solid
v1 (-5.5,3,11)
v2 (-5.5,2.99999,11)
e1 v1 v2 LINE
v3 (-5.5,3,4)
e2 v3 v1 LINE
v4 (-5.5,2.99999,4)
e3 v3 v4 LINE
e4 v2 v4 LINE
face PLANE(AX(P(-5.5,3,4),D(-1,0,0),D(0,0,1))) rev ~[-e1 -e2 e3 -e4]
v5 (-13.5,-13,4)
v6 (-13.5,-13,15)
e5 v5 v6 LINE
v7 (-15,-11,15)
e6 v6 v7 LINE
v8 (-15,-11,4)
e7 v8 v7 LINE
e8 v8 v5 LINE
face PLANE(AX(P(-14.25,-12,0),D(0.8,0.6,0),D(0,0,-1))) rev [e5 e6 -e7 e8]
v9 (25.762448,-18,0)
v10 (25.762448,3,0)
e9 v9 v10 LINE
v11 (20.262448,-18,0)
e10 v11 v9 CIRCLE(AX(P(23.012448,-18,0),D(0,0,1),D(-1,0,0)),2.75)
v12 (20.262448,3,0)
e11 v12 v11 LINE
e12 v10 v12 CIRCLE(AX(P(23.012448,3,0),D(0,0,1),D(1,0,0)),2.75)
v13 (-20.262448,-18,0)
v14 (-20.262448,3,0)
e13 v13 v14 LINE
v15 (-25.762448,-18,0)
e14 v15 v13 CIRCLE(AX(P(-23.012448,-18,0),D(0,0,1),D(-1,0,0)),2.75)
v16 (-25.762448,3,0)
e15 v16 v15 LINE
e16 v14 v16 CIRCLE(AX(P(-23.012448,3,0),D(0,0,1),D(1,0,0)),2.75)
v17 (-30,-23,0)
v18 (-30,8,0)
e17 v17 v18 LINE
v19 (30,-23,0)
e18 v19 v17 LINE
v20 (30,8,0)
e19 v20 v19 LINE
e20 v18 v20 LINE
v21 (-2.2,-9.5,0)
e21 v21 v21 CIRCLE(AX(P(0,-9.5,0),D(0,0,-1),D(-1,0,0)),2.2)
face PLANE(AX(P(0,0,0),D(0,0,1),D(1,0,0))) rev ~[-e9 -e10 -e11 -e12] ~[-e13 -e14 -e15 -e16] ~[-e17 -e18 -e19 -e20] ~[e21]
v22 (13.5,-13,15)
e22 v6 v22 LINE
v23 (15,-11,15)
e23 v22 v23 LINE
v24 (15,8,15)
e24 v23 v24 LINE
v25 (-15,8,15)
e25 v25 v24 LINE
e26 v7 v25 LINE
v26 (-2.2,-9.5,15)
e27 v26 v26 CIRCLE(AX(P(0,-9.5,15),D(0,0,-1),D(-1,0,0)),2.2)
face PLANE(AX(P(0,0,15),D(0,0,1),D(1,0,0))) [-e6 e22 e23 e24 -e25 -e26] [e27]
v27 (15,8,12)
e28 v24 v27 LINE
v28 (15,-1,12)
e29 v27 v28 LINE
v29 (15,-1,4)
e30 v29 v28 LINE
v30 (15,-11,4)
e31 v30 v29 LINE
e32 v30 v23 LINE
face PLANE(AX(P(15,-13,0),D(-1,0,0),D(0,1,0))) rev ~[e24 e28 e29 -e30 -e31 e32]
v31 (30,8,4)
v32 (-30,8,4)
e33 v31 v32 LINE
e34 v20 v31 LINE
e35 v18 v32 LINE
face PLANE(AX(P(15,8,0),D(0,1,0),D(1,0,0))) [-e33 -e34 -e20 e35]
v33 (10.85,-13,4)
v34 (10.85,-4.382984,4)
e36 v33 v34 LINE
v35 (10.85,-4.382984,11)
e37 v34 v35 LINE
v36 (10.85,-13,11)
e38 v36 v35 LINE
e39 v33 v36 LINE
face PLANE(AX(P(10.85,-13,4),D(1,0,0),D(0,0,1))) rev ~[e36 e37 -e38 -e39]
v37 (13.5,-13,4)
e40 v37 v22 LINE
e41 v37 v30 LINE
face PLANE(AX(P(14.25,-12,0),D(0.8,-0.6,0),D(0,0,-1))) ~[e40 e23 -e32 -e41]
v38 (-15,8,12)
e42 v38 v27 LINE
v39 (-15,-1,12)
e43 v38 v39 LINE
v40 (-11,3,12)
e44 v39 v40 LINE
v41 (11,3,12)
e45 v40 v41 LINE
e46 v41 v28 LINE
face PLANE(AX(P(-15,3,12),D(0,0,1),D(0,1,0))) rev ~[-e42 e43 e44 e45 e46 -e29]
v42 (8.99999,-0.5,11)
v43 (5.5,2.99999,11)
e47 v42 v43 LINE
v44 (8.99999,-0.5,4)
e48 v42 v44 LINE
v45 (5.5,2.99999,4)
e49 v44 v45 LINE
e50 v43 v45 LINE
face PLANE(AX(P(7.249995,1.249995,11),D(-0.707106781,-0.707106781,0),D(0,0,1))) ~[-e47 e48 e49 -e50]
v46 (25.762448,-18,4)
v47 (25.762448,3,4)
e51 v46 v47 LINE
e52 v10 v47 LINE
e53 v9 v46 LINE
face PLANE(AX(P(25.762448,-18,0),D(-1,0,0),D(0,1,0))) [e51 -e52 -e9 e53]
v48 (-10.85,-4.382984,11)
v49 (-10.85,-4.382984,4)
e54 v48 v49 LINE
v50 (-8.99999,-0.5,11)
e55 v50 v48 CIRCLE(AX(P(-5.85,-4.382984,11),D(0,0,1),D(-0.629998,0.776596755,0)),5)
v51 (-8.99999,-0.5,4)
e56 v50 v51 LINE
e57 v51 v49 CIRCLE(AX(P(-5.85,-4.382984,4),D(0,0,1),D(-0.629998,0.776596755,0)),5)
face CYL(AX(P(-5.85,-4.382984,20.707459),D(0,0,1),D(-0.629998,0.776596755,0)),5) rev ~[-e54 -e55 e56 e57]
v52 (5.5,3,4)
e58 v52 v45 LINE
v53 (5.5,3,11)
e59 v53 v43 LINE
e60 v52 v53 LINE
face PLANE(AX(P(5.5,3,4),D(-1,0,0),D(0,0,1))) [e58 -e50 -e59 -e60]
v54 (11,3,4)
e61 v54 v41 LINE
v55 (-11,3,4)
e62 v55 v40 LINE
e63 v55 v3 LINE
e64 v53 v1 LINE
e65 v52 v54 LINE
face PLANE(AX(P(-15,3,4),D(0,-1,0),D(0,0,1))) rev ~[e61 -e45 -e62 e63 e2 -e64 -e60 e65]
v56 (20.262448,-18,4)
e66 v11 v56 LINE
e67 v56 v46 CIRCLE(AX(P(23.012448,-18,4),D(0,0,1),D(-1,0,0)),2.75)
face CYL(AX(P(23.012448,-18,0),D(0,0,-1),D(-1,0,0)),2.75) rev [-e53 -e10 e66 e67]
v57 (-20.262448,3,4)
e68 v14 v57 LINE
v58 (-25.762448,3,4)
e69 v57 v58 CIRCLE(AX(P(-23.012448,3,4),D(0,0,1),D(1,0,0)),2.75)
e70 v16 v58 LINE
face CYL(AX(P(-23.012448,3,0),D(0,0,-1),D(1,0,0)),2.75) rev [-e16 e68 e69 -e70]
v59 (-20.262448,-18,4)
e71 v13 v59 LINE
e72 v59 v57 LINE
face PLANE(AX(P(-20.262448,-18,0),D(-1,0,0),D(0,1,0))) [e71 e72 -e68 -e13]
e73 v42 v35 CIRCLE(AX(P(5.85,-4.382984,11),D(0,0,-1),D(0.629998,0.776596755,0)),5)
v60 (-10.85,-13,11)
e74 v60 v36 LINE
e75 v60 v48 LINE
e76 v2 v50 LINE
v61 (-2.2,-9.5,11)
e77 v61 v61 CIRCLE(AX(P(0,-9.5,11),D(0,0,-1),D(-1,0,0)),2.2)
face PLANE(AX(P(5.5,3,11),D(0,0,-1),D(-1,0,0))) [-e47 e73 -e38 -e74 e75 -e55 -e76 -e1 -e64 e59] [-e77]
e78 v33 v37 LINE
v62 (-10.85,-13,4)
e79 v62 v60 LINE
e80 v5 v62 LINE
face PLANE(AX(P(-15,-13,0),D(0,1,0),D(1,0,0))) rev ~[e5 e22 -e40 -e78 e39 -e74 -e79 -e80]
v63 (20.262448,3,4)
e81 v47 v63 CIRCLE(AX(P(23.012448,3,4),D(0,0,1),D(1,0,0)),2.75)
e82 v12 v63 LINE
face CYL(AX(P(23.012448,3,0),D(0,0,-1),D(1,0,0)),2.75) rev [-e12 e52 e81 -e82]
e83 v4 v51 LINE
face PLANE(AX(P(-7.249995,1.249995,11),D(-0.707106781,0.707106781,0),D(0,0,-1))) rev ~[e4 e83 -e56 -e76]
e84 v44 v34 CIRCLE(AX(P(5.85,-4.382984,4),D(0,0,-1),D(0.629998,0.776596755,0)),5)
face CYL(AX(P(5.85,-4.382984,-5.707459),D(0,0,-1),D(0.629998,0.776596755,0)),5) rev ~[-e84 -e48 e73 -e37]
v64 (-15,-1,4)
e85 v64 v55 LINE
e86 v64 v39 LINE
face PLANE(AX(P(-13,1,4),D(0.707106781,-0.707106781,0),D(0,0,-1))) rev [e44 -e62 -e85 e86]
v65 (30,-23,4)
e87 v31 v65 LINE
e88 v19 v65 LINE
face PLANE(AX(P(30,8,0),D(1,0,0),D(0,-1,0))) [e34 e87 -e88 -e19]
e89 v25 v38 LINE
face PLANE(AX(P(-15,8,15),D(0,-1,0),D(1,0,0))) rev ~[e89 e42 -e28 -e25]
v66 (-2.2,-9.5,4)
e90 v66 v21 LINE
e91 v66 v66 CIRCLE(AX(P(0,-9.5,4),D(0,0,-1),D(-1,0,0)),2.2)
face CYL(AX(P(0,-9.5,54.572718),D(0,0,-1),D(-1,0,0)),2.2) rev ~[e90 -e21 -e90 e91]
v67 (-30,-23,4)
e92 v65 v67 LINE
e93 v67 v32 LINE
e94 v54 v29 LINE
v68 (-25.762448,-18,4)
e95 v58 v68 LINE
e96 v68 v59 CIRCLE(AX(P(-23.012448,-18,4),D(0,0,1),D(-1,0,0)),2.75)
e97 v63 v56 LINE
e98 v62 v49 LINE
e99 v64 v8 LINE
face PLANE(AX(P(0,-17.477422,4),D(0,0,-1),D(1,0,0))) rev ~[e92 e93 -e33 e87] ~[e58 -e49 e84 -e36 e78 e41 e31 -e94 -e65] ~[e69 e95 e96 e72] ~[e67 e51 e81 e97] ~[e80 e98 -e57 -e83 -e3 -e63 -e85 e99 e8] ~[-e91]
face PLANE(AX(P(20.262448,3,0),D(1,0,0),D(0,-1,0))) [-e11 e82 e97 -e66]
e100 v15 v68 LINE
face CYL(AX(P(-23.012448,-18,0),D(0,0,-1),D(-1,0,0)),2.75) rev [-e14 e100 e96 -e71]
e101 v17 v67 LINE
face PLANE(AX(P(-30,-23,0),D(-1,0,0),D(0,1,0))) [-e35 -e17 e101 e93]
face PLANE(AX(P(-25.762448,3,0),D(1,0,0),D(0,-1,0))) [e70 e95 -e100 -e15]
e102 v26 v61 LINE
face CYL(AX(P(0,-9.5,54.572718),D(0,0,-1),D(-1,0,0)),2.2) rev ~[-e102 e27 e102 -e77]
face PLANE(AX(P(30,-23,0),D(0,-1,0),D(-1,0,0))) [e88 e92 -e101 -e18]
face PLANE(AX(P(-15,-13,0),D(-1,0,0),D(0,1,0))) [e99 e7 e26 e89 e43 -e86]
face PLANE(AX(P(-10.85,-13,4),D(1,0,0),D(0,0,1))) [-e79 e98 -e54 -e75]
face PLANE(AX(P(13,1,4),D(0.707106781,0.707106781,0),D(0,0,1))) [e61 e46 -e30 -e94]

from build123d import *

# Parameters (mm, degrees)
F0_W         = 30
F0_H         = 26
F1_DEPTH     = 15
F3_SIZE2     = 2
F3_SIZE      = 1.5
F5_DEPTH     = 30.001
F6_SIZE      = 4
F2_W         = 21.7
F2_H         = 7
F7_DEPTH     = 12.5
F8_W         = 11
F8_H         = 7
F9_DEPTH     = 4
F10_W        = 30
F10_H        = 5
F11_DEPTH    = 15.001
F13_D        = 4.4
F15_DEPTH    = 4
F16_SIZE     = 3.49999
F17_T4_DEPTH = 26.4149188769
F18_SIZE     = 3.49999
F19_T4_DEPTH = 26.4149188769


# Not quite as in the source:
# - a fillet or chamfer that OpenCascade refuses, or shapes differently, is made with other operations: its cross-section is extruded or revolved along the edge and cut away or added
# - a fillet or chamfer is up to 0.001 mm smaller than in the source, because OpenCascade refuses the exact size


with BuildPart() as f1:
    # F0 (on Top) → F1 (new body)
    with BuildSketch(Plane.XY):
        Rectangle(F0_W, F0_H)
    extrude(amount=F1_DEPTH)

    # F3
    f3_edges = [f1.edges().sort_by_distance(p)[0] for p in [
        (-15, -13, 7.5),
        (15, -13, 7.5),
    ]]
    f3_side = f1.faces().sort_by_distance((0, -13, 7.5))[0]
    chamfer(f3_edges, length=F3_SIZE, length2=F3_SIZE2, reference=f3_side)

    # F4 (on face) → F5 (cut, through all)
    with BuildSketch(Plane(origin=(-15, 0, 0), x_dir=(0, -1, 0), z_dir=(-1, 0, 0))):
        Polygon((-13, 12), (-13, 0), (-8, 0), (-8, 4), (-3, 4), (-3, 12), align=None)
    extrude(amount=-F5_DEPTH, mode=Mode.SUBTRACT)

    # F6
    f6_edges = [f1.edges().sort_by_distance(p)[0] for p in [
        (-15, 3, 8),
        (15, 3, 8),
    ]]
    chamfer(f6_edges, length=F6_SIZE)

    # F2 (on face) → F7 (cut)
    with BuildSketch(Plane.XZ.offset(13)):
        with Locations((0, 7.5)):
            Rectangle(F2_W, F2_H)
    extrude(amount=-F7_DEPTH, mode=Mode.SUBTRACT)

    # F8 (on face) → F9 (cut)
    with BuildSketch(Plane(origin=(0, 3, 0), x_dir=(-1, 0, 0), z_dir=(0, 1, 0))):
        with Locations((0, 7.5)):
            Rectangle(F8_W, F8_H)
    extrude(amount=-F9_DEPTH, mode=Mode.SUBTRACT)

    # F10 (on face) → F11 (cut, through all)
    with BuildSketch(Plane.XY.offset(15)):
        with Locations((0, 10.5)):
            Rectangle(F10_W, F10_H)
    extrude(amount=-F11_DEPTH, mode=Mode.SUBTRACT)

    # F13 (through all)
    with Locations(Plane.XY.offset(15)):
        with Locations((0, -9.5)):
            Hole(F13_D / 2)

    # F14 (on face) → F15 (join)
    with BuildSketch(Plane(origin=(0, 0, 0), x_dir=(1, 0, 0), z_dir=(0, 0, -1))):
        with BuildLine():
            Line((30, 23), (-30, 23))
            Line((-30, 23), (-30, 11))
            Line((-30, 11), (-25.7624481171, 11))
            Line((-25.7624481171, 11), (-25.7624481171, 18))
            ThreePointArc((-25.7624481171, 18), (-23.0124481171, 20.75), (-20.2624481171, 18))
            Line((-20.2624481171, 18), (-20.2624481171, 11))
            Line((-20.2624481171, 11), (-15, 11))
            Line((-15, 11), (-13.5, 13))
            Line((-13.5, 13), (13.5, 13))
            Line((13.5, 13), (15, 11))
            Line((15, 11), (20.2624481171, 11))
            Line((20.2624481171, 11), (20.2624481171, 18))
            ThreePointArc((20.2624481171, 18), (23.0124481171, 20.75), (25.7624481171, 18))
            Line((25.7624481171, 18), (25.7624481171, 11))
            Line((25.7624481171, 11), (30, 11))
            Line((30, 11), (30, 23))
        make_face()
        with BuildLine():
            Line((-25.7624481171, 11), (-30, 11))
            Line((-30, 11), (-30, -8))
            Line((-30, -8), (-15, -8))
            Line((-15, -8), (-15, 11))
            Line((-15, 11), (-20.2624481171, 11))
            Line((-20.2624481171, 11), (-20.2624481171, -3))
            ThreePointArc((-20.2624481171, -3), (-23.0124481171, -5.75), (-25.7624481171, -3))
            Line((-25.7624481171, -3), (-25.7624481171, 11))
        make_face()
        with BuildLine():
            Line((30, -8), (30, 11))
            Line((30, 11), (25.7624481171, 11))
            Line((25.7624481171, 11), (25.7624481171, -3))
            ThreePointArc((25.7624481171, -3), (23.0124481171, -5.75), (20.2624481171, -3))
            Line((20.2624481171, -3), (20.2624481171, 11))
            Line((20.2624481171, 11), (15, 11))
            Line((15, 11), (15, -8))
            Line((15, -8), (30, -8))
        make_face()
    extrude(amount=-F15_DEPTH)

    # F16 (size 3.5 in the source; OpenCascade refuses exactly that, so slightly less here)
    f16_edges = [f1.edges().sort_by_distance(p)[0] for p in [
        (-5.5, -0.5, 7.5),
    ]]
    chamfer(f16_edges, length=F16_SIZE)

    # F17: fillet of radius 5 on 1 edges, made by hand


with BuildPart() as f17_tool2:
    # F17_s3 → F17_t4 (new body)
    with BuildSketch(Plane.XY.offset(20.7074594385)):
        with BuildLine():
            ThreePointArc((-8.99999, -0.5), (-10.3638647521, -2.2323966462), (-10.85, -4.3829837754))
            Line((-10.85, -4.3829837754), (-10.85, -0.5))
            Line((-10.85, -0.5), (-8.99999, -0.5))
        make_face()
    extrude(amount=-F17_T4_DEPTH)

    split(bisect_by=Plane.XY.offset(15), keep=Keep.BOTTOM)

    split(bisect_by=Plane.XY, keep=Keep.TOP)


with BuildPart() as f1_1:
    add(f1.part)

    # F17_t1: union F17_tool2
    add(f17_tool2.part)

    # F18 (size 3.5 in the source; OpenCascade refuses exactly that, so slightly less here)
    f18_edges = [f1_1.edges().sort_by_distance(p)[0] for p in [
        (5.5, -0.5, 7.5),
    ]]
    chamfer(f18_edges, length=F18_SIZE)

    # F19: fillet of radius 5 on 1 edges, made by hand


with BuildPart() as f19_tool2:
    # F19_s3 → F19_t4 (new body)
    with BuildSketch(Plane.XY.offset(-5.7074594385)):
        with BuildLine():
            ThreePointArc((8.99999, -0.5), (10.3638647521, -2.2323966462), (10.85, -4.3829837754))
            Line((10.85, -4.3829837754), (10.85, -0.5))
            Line((10.85, -0.5), (8.99999, -0.5))
        make_face()
    extrude(amount=F19_T4_DEPTH)

    split(bisect_by=Plane.XY.offset(15), keep=Keep.BOTTOM)

    split(bisect_by=Plane.XY, keep=Keep.TOP)


with BuildPart() as f1_2:
    add(f1_1.part)

    # F19_t1: union F19_tool2
    add(f19_tool2.part)


solid = f1_2.part
